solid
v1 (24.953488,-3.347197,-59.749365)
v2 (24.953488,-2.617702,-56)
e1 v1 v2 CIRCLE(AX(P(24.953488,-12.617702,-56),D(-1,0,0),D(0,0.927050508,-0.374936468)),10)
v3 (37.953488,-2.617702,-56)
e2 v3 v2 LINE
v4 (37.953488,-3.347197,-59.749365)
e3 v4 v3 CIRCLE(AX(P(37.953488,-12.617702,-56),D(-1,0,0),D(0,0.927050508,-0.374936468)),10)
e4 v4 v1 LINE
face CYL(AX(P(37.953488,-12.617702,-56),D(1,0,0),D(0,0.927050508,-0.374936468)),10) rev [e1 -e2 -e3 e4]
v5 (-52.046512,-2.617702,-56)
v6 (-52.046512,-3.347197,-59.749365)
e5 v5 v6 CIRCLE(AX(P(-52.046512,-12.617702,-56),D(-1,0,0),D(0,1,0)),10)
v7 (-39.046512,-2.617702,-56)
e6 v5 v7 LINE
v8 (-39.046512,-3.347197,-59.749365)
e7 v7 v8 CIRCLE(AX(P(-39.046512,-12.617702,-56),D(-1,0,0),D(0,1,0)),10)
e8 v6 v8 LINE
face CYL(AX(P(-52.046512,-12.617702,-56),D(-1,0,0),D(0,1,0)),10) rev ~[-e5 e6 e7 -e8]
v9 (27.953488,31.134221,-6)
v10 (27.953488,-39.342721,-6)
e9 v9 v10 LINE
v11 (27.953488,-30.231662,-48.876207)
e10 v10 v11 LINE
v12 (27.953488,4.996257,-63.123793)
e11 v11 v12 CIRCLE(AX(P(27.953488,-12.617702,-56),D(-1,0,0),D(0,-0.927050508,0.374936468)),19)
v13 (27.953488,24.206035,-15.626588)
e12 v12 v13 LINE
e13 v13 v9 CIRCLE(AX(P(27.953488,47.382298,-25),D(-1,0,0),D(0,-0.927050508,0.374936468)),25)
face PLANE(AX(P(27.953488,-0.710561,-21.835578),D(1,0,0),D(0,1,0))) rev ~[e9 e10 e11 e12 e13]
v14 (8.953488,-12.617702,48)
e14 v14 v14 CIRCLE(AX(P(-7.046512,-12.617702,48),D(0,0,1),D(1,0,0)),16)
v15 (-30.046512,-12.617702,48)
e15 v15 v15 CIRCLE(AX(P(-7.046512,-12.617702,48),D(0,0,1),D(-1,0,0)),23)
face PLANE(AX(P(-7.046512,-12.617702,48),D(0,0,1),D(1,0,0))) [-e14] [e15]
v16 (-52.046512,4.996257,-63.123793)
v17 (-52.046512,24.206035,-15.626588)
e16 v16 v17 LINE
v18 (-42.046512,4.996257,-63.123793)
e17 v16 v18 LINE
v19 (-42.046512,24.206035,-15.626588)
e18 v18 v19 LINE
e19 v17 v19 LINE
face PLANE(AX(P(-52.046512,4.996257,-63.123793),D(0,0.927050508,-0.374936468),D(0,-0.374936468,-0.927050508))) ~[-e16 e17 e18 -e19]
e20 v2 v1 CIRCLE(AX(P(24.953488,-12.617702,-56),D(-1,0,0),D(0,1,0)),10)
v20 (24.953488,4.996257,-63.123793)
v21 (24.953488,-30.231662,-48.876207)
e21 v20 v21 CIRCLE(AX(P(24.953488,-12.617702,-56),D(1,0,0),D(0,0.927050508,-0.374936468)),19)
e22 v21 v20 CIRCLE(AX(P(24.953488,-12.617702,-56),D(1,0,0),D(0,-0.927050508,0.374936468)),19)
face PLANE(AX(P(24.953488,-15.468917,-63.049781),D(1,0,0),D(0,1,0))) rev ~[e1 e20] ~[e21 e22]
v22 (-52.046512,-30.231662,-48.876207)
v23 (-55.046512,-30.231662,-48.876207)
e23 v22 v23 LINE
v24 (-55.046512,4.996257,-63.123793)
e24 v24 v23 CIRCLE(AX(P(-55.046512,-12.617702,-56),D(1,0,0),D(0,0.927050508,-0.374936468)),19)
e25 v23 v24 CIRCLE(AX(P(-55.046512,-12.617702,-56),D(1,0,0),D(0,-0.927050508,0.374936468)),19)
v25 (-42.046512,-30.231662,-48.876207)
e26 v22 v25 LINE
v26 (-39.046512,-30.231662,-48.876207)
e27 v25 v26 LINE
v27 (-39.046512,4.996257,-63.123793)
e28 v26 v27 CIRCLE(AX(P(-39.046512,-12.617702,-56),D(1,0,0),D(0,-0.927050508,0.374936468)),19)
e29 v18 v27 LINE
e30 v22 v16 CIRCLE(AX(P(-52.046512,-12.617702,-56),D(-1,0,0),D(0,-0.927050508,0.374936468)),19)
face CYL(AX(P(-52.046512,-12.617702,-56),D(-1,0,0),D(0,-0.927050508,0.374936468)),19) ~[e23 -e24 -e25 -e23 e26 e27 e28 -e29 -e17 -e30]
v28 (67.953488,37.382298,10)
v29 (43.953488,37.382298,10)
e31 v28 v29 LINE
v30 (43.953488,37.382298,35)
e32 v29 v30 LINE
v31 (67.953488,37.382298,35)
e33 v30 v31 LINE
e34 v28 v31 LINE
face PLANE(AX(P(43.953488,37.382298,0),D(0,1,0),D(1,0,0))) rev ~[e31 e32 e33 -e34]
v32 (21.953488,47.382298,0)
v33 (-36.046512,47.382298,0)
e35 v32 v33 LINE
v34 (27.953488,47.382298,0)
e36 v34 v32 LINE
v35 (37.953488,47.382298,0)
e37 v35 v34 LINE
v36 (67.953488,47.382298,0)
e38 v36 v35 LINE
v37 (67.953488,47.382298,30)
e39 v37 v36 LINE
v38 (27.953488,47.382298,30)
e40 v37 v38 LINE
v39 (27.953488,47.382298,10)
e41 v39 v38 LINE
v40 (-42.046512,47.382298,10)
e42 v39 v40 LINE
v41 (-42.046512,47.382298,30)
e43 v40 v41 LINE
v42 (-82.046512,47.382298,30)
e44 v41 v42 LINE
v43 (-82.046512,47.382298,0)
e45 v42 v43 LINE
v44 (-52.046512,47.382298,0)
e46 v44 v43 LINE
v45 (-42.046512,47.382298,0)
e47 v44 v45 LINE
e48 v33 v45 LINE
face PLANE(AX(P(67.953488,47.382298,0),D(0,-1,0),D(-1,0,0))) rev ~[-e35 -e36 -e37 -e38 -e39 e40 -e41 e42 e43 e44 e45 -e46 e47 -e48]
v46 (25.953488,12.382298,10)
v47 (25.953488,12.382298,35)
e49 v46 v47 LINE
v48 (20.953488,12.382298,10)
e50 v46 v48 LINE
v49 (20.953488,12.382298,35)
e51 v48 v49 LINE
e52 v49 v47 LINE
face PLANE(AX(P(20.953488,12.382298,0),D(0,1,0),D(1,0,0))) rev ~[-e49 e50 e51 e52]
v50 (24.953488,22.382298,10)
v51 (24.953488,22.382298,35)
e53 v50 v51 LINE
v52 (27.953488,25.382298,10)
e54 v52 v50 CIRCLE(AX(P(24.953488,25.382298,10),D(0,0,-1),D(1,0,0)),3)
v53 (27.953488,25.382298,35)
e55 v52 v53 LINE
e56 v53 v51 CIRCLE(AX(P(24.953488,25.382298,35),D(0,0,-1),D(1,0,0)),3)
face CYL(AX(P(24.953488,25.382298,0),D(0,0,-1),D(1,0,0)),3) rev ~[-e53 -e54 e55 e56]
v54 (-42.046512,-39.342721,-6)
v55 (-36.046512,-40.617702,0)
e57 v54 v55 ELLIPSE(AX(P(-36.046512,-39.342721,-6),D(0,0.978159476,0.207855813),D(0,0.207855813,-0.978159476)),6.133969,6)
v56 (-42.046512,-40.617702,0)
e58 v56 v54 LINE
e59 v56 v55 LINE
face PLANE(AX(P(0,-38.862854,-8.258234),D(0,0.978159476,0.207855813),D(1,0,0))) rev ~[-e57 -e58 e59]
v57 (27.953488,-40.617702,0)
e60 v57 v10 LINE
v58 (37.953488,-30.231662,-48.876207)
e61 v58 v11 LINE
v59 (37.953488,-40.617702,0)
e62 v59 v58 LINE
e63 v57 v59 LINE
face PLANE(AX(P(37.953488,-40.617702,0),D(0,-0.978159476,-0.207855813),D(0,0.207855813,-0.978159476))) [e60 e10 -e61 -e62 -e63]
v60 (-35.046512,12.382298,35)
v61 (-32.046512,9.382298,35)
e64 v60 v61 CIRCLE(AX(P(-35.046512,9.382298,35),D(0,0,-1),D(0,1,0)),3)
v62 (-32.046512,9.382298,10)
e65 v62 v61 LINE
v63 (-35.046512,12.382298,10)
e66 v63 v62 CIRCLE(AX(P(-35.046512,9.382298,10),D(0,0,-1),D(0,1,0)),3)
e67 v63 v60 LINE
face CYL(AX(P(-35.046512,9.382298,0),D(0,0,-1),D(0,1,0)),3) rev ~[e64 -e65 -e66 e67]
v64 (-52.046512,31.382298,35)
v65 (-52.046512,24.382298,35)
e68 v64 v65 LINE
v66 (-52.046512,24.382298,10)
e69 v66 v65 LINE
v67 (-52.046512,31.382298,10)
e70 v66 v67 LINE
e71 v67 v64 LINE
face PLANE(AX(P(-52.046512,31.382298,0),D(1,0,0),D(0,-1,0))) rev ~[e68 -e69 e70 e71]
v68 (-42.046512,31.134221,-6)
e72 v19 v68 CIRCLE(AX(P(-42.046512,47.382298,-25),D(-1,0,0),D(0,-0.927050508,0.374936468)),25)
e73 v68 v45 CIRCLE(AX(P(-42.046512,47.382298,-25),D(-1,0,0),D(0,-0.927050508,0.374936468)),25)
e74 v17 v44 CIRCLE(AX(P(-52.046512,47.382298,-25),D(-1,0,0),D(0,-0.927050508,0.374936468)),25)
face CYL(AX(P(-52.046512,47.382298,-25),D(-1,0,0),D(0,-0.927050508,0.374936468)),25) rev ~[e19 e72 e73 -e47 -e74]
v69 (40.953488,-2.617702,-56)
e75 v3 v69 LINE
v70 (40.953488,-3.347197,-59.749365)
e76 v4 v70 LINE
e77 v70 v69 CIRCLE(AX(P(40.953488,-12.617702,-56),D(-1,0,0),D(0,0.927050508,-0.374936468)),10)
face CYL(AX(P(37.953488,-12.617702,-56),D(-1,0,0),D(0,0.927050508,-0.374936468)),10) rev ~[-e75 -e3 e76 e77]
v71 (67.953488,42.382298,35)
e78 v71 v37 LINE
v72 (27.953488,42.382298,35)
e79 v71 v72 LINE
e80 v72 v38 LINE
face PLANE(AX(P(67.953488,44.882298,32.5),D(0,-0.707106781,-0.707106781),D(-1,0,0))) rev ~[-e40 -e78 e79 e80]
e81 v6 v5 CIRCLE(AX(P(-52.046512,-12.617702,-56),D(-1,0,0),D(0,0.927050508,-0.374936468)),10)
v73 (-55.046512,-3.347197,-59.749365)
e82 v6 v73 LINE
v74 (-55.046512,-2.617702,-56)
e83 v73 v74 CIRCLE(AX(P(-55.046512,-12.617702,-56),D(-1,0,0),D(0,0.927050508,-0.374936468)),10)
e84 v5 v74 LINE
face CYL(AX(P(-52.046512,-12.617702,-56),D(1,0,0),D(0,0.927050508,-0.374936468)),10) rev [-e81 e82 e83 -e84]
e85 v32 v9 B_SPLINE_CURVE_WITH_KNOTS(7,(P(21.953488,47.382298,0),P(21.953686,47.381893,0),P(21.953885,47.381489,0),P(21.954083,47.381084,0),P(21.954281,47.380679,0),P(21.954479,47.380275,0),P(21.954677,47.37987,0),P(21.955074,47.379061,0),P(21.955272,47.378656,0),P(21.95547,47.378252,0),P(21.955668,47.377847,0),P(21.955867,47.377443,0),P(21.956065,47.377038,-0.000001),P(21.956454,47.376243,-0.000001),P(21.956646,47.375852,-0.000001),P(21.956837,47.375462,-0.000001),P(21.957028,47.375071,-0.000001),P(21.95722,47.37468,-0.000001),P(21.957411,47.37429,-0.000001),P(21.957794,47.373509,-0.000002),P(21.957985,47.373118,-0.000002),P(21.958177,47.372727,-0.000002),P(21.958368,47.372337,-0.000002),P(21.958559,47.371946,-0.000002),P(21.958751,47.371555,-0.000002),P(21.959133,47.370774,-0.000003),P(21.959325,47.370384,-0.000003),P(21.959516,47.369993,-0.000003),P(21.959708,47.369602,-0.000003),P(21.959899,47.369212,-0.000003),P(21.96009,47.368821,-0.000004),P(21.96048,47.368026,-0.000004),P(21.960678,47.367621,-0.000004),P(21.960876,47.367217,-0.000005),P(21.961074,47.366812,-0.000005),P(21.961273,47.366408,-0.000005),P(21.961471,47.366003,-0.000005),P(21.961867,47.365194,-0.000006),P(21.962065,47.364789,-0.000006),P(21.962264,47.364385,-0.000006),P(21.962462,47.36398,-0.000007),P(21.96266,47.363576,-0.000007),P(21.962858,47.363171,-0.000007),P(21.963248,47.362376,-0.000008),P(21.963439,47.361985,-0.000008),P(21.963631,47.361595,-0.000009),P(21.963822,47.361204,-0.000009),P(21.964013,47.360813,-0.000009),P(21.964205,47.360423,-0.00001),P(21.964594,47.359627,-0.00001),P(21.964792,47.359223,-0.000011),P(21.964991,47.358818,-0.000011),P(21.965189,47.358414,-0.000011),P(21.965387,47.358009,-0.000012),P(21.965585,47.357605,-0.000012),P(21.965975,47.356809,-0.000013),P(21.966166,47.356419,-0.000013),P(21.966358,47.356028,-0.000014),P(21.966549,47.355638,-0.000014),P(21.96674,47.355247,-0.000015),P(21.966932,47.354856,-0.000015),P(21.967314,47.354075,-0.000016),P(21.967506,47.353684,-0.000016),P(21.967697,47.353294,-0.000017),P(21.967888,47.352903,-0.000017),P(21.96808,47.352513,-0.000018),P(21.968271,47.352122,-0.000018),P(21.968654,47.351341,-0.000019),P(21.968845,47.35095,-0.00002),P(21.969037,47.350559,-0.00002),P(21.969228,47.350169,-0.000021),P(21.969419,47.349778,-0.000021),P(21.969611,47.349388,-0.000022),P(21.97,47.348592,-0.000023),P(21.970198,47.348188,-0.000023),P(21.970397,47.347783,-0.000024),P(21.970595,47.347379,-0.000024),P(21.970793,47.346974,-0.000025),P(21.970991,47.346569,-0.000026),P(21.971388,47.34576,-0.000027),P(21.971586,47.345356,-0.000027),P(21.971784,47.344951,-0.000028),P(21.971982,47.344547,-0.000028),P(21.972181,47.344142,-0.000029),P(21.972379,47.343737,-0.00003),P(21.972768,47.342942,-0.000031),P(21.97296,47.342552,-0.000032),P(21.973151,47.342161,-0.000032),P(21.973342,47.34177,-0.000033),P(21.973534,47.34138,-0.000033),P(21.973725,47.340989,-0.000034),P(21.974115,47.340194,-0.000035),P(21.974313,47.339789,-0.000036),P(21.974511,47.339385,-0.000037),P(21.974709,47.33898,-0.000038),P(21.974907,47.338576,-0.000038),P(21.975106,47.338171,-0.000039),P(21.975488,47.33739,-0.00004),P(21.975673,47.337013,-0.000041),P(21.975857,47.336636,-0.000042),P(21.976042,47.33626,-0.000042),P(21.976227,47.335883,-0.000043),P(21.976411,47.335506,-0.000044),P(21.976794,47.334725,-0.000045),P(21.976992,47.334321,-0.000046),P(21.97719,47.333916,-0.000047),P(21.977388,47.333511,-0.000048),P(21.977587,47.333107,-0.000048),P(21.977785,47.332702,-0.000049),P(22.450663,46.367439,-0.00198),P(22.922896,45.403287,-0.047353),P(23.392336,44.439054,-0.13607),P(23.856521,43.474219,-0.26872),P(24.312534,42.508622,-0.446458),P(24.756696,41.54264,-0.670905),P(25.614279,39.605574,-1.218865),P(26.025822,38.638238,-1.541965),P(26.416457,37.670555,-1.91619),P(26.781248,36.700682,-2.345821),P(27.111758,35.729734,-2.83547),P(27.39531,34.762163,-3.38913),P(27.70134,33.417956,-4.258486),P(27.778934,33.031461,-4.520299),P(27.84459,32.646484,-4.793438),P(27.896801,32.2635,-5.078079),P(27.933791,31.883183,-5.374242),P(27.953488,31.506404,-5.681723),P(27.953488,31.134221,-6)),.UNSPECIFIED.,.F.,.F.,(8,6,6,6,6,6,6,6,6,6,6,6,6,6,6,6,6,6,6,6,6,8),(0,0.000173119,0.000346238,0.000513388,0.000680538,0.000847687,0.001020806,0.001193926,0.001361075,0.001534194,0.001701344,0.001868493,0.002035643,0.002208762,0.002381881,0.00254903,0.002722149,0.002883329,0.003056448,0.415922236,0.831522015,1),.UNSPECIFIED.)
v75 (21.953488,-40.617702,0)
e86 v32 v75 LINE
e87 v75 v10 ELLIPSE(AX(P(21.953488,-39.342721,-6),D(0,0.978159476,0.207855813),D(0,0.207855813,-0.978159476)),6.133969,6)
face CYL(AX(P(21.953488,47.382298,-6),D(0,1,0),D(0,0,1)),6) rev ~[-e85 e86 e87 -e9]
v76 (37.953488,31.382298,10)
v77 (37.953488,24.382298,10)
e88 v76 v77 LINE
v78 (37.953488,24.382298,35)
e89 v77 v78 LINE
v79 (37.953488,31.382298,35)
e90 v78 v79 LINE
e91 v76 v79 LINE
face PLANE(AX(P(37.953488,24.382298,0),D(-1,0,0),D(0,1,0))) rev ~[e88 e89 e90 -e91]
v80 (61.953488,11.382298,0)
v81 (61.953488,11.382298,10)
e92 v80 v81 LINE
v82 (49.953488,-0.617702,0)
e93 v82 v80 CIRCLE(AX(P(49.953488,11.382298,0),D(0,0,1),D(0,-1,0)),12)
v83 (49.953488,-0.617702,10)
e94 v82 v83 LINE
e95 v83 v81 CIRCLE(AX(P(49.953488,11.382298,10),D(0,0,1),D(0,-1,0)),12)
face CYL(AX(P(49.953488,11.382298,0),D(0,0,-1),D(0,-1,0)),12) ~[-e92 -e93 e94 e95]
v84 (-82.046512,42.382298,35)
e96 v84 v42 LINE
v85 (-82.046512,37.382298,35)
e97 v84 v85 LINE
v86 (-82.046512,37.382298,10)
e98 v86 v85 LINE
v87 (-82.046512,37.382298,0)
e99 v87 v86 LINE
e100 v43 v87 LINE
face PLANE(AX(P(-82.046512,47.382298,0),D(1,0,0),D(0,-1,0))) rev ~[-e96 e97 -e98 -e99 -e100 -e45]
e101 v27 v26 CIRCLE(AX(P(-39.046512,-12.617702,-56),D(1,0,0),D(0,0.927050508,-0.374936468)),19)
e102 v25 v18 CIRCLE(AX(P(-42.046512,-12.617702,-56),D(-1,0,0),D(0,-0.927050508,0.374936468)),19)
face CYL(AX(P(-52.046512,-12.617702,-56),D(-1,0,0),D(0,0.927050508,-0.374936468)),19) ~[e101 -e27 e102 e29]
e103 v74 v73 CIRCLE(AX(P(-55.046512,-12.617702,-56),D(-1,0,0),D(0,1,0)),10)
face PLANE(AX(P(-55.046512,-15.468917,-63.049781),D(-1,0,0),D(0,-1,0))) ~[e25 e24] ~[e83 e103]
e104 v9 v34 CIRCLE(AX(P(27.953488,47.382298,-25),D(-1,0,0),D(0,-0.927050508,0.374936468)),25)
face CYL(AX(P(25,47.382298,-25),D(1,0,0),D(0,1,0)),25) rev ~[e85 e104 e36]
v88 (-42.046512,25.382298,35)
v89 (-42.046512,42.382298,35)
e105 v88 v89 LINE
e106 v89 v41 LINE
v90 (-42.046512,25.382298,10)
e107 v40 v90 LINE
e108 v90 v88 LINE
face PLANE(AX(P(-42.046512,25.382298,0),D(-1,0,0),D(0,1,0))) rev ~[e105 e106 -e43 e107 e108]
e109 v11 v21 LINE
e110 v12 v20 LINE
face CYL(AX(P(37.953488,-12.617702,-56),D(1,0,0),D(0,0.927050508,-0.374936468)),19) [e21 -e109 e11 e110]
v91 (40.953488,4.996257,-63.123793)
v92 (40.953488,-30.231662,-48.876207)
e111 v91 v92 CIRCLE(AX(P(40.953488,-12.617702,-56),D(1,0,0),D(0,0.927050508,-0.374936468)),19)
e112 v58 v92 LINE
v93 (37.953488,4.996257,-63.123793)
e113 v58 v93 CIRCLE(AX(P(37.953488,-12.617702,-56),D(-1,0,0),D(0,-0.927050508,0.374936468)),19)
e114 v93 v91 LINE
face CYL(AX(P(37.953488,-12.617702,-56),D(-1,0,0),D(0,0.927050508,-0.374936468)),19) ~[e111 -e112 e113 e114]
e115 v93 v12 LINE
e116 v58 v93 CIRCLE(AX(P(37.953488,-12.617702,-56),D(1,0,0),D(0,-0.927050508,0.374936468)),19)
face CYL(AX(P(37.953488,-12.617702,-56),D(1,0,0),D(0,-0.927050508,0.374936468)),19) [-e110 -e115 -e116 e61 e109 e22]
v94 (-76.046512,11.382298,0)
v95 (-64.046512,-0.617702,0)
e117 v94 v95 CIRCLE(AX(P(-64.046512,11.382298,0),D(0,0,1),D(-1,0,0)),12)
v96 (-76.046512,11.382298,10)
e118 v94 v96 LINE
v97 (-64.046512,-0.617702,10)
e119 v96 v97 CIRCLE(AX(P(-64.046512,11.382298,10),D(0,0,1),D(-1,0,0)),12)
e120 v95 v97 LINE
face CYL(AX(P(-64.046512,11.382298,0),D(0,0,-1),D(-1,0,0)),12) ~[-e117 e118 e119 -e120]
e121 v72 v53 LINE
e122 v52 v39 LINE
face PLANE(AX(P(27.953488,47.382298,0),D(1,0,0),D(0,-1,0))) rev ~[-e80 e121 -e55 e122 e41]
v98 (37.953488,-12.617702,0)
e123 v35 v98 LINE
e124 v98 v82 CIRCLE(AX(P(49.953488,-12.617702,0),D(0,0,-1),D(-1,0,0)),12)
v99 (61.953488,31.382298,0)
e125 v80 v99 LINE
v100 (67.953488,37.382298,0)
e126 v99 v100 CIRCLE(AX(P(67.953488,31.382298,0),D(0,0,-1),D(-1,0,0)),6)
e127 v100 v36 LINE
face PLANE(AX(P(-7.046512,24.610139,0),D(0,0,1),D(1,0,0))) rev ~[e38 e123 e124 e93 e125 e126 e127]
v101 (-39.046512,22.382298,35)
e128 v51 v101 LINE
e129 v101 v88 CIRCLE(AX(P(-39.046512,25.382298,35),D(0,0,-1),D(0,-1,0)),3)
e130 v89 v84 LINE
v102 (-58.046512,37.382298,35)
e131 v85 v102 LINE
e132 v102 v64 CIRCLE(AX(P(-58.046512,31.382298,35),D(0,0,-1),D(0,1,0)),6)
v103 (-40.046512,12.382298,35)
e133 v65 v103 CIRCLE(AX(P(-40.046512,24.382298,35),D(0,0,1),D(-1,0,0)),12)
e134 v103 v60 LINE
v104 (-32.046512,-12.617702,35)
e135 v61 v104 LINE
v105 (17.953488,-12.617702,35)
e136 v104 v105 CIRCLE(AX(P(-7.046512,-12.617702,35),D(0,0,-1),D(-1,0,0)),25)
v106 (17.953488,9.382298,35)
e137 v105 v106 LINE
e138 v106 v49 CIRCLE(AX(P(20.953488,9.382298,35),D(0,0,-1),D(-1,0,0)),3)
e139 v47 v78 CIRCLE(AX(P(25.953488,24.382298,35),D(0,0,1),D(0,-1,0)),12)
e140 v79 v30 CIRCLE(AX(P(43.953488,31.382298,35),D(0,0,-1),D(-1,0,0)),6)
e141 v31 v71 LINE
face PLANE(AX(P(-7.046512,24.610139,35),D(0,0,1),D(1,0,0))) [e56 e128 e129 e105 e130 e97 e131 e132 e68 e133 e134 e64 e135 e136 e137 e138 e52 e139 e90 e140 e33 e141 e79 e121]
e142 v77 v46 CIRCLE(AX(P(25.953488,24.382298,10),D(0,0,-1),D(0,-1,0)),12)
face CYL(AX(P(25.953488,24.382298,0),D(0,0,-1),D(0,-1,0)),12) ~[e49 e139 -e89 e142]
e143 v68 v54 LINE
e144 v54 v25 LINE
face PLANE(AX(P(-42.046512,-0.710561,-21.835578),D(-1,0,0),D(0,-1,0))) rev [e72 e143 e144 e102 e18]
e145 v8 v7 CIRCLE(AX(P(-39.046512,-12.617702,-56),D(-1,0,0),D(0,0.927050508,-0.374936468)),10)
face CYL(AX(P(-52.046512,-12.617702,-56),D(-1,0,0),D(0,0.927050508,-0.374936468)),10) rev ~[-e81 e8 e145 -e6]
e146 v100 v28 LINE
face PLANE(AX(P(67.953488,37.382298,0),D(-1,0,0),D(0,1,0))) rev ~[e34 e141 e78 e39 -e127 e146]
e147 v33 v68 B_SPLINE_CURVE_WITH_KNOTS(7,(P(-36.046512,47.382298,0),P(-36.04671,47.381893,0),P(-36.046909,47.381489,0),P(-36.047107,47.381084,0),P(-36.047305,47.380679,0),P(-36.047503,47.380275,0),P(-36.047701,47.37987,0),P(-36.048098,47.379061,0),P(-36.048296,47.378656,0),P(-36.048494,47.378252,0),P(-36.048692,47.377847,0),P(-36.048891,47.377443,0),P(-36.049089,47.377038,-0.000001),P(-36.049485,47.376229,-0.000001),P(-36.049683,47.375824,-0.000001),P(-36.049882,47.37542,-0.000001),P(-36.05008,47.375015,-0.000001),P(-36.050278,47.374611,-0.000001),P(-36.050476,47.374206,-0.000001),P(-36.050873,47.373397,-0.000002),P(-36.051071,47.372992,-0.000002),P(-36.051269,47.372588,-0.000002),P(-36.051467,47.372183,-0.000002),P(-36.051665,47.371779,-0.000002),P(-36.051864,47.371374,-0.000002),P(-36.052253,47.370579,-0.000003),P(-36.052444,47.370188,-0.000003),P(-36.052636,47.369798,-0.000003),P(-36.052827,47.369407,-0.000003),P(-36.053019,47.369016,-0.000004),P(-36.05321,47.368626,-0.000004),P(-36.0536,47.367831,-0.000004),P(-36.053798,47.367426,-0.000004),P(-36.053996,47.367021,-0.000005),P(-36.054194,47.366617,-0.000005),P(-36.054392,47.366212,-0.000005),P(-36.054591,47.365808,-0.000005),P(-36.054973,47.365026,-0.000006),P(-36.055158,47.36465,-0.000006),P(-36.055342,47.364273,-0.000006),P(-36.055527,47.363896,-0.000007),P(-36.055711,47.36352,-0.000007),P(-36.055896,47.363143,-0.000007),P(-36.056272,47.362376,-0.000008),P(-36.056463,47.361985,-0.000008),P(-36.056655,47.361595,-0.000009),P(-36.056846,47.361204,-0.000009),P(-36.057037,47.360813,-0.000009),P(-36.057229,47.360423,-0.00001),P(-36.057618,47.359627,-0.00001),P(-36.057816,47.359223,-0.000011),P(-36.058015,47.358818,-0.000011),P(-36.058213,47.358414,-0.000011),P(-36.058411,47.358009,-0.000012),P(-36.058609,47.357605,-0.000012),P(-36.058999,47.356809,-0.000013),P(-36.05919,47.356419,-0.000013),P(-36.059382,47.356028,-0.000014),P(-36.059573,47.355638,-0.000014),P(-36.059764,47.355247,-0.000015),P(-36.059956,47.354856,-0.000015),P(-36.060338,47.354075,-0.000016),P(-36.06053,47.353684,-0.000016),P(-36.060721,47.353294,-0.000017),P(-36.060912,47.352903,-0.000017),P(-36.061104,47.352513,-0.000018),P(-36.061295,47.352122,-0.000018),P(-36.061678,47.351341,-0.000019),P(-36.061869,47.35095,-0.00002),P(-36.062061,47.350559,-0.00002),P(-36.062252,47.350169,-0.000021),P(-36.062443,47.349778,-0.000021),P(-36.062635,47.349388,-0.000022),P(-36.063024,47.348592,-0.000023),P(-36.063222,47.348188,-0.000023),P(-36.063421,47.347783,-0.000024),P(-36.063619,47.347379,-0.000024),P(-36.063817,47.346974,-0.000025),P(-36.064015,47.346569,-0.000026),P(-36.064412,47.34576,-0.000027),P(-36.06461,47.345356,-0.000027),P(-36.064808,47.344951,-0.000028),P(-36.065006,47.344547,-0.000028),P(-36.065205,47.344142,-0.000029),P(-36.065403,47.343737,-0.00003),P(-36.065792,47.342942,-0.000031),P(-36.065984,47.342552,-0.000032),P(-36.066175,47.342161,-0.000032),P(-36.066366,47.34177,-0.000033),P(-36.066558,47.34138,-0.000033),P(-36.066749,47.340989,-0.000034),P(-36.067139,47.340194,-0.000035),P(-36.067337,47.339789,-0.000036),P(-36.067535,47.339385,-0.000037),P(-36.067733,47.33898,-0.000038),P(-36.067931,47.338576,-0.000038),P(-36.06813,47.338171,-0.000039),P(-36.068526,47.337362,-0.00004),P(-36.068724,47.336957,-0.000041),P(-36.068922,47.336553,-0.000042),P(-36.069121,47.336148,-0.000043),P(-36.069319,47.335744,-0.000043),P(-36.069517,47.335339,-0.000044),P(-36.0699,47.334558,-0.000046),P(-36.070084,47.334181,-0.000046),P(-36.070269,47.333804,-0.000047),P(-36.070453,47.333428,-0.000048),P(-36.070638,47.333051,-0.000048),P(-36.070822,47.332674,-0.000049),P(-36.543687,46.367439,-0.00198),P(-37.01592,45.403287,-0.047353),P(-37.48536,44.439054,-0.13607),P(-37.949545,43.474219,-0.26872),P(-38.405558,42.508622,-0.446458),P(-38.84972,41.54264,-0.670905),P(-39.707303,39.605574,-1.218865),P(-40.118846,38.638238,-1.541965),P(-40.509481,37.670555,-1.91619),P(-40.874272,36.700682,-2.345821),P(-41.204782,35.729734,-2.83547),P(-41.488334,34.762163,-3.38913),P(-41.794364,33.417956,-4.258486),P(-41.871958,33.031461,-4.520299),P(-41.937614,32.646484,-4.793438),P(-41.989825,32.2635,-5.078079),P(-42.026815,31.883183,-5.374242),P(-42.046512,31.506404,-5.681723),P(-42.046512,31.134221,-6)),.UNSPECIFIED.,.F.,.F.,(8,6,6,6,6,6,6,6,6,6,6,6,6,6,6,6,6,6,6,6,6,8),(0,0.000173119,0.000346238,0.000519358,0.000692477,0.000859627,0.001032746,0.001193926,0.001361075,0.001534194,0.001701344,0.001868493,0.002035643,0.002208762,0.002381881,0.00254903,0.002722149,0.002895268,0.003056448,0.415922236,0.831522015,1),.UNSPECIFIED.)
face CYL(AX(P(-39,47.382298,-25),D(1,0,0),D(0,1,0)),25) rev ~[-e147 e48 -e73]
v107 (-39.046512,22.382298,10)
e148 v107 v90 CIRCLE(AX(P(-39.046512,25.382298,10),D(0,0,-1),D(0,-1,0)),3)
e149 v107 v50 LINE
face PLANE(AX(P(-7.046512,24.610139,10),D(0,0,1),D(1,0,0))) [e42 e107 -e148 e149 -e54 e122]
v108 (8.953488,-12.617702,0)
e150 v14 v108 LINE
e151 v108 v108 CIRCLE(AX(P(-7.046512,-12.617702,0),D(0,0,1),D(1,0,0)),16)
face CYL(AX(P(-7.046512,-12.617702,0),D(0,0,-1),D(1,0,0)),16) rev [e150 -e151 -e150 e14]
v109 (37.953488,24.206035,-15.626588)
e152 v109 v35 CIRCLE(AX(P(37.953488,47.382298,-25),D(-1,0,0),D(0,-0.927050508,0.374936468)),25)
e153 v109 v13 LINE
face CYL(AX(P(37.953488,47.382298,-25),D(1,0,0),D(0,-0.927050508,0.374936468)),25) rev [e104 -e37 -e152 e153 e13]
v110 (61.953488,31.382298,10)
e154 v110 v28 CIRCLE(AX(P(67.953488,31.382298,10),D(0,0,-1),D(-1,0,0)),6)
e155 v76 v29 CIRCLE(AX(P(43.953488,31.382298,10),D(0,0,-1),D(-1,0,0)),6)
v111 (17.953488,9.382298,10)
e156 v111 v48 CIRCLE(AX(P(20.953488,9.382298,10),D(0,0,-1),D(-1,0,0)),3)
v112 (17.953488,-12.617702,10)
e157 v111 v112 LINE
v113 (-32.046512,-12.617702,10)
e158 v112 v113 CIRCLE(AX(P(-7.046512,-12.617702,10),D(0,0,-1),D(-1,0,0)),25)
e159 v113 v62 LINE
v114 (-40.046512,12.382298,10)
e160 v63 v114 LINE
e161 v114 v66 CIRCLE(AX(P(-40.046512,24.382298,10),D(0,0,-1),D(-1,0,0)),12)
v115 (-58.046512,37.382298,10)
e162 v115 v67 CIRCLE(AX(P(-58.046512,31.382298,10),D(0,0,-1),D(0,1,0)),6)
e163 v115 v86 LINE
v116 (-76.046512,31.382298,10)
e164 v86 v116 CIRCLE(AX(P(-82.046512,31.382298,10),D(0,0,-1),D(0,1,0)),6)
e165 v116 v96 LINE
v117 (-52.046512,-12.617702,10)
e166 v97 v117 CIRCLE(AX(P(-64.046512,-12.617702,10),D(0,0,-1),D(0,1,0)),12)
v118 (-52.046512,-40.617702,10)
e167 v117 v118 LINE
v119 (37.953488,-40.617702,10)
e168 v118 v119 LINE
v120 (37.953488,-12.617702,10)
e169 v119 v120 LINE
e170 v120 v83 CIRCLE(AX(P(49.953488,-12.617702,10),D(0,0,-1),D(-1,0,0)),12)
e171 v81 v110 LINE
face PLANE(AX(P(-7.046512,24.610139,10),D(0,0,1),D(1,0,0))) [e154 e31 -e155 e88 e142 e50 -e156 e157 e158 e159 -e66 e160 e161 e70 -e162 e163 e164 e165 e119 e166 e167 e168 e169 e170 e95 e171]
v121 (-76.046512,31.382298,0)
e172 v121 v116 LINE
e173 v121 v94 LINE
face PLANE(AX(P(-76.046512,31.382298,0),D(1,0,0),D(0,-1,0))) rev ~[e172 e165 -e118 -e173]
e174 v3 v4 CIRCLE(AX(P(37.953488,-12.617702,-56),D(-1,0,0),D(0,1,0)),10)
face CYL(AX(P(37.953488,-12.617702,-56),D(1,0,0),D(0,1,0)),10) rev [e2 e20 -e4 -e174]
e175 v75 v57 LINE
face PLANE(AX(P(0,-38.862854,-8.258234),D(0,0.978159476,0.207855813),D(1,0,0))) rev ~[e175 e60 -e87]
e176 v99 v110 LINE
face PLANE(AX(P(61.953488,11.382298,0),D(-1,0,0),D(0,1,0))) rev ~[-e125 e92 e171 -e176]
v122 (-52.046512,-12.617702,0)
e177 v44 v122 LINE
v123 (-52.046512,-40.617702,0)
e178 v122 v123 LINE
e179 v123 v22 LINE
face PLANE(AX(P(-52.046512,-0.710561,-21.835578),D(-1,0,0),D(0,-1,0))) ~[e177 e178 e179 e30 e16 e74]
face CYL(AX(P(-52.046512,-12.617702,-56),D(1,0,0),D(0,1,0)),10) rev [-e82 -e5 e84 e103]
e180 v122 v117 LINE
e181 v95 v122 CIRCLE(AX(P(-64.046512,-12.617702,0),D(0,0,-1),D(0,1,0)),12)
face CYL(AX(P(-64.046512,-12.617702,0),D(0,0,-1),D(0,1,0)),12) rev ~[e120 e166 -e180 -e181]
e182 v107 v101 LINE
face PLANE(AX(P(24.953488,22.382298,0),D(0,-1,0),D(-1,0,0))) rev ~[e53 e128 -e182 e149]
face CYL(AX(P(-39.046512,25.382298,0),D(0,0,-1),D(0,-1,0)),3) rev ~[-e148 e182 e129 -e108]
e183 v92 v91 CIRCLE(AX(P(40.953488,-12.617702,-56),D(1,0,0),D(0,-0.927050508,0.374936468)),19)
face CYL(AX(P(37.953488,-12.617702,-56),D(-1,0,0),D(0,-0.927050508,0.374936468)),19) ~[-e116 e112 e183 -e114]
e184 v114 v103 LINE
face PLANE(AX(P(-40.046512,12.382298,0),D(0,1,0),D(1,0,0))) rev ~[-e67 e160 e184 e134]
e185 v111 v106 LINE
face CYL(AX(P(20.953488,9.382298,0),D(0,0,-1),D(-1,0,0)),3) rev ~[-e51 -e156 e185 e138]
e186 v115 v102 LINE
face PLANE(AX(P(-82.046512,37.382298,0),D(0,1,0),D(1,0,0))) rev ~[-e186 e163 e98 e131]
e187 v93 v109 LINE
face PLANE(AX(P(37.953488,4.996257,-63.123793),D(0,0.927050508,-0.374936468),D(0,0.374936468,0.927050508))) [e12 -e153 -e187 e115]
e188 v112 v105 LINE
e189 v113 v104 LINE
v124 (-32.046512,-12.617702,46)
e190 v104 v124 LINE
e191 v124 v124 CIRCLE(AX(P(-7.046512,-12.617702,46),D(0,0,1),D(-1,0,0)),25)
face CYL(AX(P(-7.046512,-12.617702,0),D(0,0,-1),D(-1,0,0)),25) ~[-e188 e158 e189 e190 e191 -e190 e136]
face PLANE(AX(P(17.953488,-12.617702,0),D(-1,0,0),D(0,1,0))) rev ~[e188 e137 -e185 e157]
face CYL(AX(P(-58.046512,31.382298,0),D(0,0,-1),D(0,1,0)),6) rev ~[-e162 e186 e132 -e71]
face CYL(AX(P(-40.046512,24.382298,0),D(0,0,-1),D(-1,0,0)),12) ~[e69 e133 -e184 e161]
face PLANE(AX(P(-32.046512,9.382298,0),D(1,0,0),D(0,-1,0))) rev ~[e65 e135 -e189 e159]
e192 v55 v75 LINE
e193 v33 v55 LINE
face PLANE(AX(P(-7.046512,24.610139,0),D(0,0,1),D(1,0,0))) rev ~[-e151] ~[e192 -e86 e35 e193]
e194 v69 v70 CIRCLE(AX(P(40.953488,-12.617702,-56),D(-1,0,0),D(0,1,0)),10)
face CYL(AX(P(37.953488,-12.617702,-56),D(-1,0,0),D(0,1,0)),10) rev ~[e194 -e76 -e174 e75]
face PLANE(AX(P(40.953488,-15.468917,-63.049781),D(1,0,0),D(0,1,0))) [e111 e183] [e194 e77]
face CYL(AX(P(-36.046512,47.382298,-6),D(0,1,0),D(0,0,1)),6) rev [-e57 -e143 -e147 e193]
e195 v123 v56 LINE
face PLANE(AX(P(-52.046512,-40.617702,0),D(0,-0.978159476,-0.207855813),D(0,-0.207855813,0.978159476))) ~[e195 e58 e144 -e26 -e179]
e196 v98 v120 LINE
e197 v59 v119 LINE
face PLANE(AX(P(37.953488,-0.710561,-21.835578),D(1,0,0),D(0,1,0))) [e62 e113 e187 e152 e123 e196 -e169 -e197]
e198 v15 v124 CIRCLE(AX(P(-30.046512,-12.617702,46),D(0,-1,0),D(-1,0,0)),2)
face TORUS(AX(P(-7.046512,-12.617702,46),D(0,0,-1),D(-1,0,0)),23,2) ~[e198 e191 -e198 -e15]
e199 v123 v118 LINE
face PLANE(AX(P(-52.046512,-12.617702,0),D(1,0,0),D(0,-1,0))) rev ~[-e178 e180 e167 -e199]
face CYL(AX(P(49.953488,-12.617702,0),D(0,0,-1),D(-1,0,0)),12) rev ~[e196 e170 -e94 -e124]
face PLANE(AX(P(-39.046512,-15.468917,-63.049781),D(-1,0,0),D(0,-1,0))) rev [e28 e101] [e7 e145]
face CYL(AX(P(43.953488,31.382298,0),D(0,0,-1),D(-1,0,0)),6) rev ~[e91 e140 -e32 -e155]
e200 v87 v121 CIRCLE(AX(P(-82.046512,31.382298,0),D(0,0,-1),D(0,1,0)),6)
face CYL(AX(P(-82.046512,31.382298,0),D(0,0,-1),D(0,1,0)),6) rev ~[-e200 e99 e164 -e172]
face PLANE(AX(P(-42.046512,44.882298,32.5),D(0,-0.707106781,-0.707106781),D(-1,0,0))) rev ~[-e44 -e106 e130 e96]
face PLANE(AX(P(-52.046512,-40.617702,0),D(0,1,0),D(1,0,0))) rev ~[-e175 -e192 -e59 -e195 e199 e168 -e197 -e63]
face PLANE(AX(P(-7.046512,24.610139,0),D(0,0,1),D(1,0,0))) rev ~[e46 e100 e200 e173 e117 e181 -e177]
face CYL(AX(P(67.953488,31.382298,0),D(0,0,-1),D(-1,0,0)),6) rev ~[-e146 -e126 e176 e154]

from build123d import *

# Parameters (mm, degrees)
F0_R          = 16
F1_DEPTH      = 10
F2_DEPTH      = 35
F3_DEPTH      = 48
F5_DEPTH      = 10
F6_DEPTH      = 3
F6_DEPTH_BACK = 13
F7_T4_DEPTH   = 103
F7_S5_R       = 25
F7_T6_DEPTH   = 53
F7_T11_DEPTH  = 103
F7_S12_R      = 25
F7_T13_DEPTH  = 53
F13_R         = 2
F14_SIZE      = 5


# Not quite as in the source:
# - a fillet or chamfer that OpenCascade refuses, or shapes differently, is made with other operations: its cross-section is extruded or revolved along the edge and cut away or added
# - a feature of the source that left no trace in its solid (it failed there, or was rolled back) is left out
# - a pattern or mirror of a feature is missing from the dataset's text; its kind, count and spacing are read off the source's solid


with BuildPart() as f1:
    # F0 (on Top) → F1 (new body)
    with BuildSketch(Plane.XY):
        with BuildLine():
            Line((-42.0465118704, 47.3822976644), (-82.0465118704, 47.3822976644))
            Line((-82.0465118704, 47.3822976644), (-82.0465118704, 37.3822976644))
            Line((-82.0465118704, 37.3822976644), (-58.0465118704, 37.3822976644))
            ThreePointArc((-58.0465118704, 37.3822976644), (-53.8038711833, 35.6249383515), (-52.0465118704, 31.3822976644))
            Line((-52.0465118704, 31.3822976644), (-52.0465118704, 24.3822976644))
            ThreePointArc((-52.0465118704, 24.3822976644), (-48.5317932447, 15.8970162901), (-40.0465118704, 12.3822976644))
            Line((-40.0465118704, 12.3822976644), (-35.0465118704, 12.3822976644))
            ThreePointArc((-35.0465118704, 12.3822976644), (-32.9251915269, 11.5036180079), (-32.0465118704, 9.3822976644))
            Line((-32.0465118704, 9.3822976644), (-32.0465118704, -12.6177023356))
            ThreePointArc((-32.0465118704, -12.6177023356), (-7.0465118704, 12.3822976644), (17.9534881296, -12.6177023356))
            Line((17.9534881296, -12.6177023356), (17.9534881296, 9.3822976644))
            ThreePointArc((17.9534881296, 9.3822976644), (18.832167786, 11.5036180079), (20.9534881296, 12.3822976644))
            Line((20.9534881296, 12.3822976644), (25.9534881296, 12.3822976644))
            ThreePointArc((25.9534881296, 12.3822976644), (34.4387695038, 15.8970162901), (37.9534881296, 24.3822976644))
            Line((37.9534881296, 24.3822976644), (37.9534881296, 31.3822976644))
            ThreePointArc((37.9534881296, 31.3822976644), (39.7108474424, 35.6249383515), (43.9534881296, 37.3822976644))
            Line((43.9534881296, 37.3822976644), (67.9534881296, 37.3822976644))
            Line((67.9534881296, 37.3822976644), (67.9534881296, 47.3822976644))
            Line((67.9534881296, 47.3822976644), (27.9534881296, 47.3822976644))
            Line((27.9534881296, 47.3822976644), (27.9534881296, 25.3822976644))
            ThreePointArc((27.9534881296, 25.3822976644), (27.0748084731, 23.2609773208), (24.9534881296, 22.3822976644))
            Line((24.9534881296, 22.3822976644), (-39.0465118704, 22.3822976644))
            ThreePointArc((-39.0465118704, 22.3822976644), (-41.167832214, 23.2609773208), (-42.0465118704, 25.3822976644))
            Line((-42.0465118704, 25.3822976644), (-42.0465118704, 47.3822976644))
        make_face()
        with BuildLine():
            Line((27.9534881296, 47.3822976644), (-42.0465118704, 47.3822976644))
            Line((-42.0465118704, 47.3822976644), (-42.0465118704, 25.3822976644))
            ThreePointArc((-42.0465118704, 25.3822976644), (-41.167832214, 23.2609773208), (-39.0465118704, 22.3822976644))
            Line((-39.0465118704, 22.3822976644), (24.9534881296, 22.3822976644))
            ThreePointArc((24.9534881296, 22.3822976644), (27.0748084731, 23.2609773208), (27.9534881296, 25.3822976644))
            Line((27.9534881296, 25.3822976644), (27.9534881296, 47.3822976644))
        make_face()
        with BuildLine():
            Line((-58.0465118704, 37.3822976644), (-82.0465118704, 37.3822976644))
            ThreePointArc((-82.0465118704, 37.3822976644), (-77.8038711833, 35.6249383515), (-76.0465118704, 31.3822976644))
            Line((-76.0465118704, 31.3822976644), (-76.0465118704, 11.3822976644))
            ThreePointArc((-76.0465118704, 11.3822976644), (-72.5317932447, 2.8970162901), (-64.0465118704, -0.6177023356))
            ThreePointArc((-64.0465118704, -0.6177023356), (-55.5612304962, -4.1324209614), (-52.0465118704, -12.6177023356))
            Line((-52.0465118704, -12.6177023356), (-52.0465118704, -40.6177023356))
            Line((-52.0465118704, -40.6177023356), (37.9534881296, -40.6177023356))
            Line((37.9534881296, -40.6177023356), (37.9534881296, -12.6177023356))
            ThreePointArc((37.9534881296, -12.6177023356), (41.4682067553, -4.1324209614), (49.9534881296, -0.6177023356))
            ThreePointArc((49.9534881296, -0.6177023356), (58.4387695038, 2.8970162901), (61.9534881296, 11.3822976644))
            Line((61.9534881296, 11.3822976644), (61.9534881296, 31.3822976644))
            ThreePointArc((61.9534881296, 31.3822976644), (63.7108474424, 35.6249383515), (67.9534881296, 37.3822976644))
            Line((67.9534881296, 37.3822976644), (43.9534881296, 37.3822976644))
            ThreePointArc((43.9534881296, 37.3822976644), (39.7108474424, 35.6249383515), (37.9534881296, 31.3822976644))
            Line((37.9534881296, 31.3822976644), (37.9534881296, 24.3822976644))
            ThreePointArc((37.9534881296, 24.3822976644), (34.4387695038, 15.8970162901), (25.9534881296, 12.3822976644))
            Line((25.9534881296, 12.3822976644), (20.9534881296, 12.3822976644))
            ThreePointArc((20.9534881296, 12.3822976644), (18.832167786, 11.5036180079), (17.9534881296, 9.3822976644))
            Line((17.9534881296, 9.3822976644), (17.9534881296, -12.6177023356))
            ThreePointArc((17.9534881296, -12.6177023356), (-7.0465118704, -37.6177023356), (-32.0465118704, -12.6177023356))
            Line((-32.0465118704, -12.6177023356), (-32.0465118704, 9.3822976644))
            ThreePointArc((-32.0465118704, 9.3822976644), (-32.9251915269, 11.5036180079), (-35.0465118704, 12.3822976644))
            Line((-35.0465118704, 12.3822976644), (-40.0465118704, 12.3822976644))
            ThreePointArc((-40.0465118704, 12.3822976644), (-48.5317932447, 15.8970162901), (-52.0465118704, 24.3822976644))
            Line((-52.0465118704, 24.3822976644), (-52.0465118704, 31.3822976644))
            ThreePointArc((-52.0465118704, 31.3822976644), (-53.8038711833, 35.6249383515), (-58.0465118704, 37.3822976644))
        make_face()
        with BuildLine():
            ThreePointArc((17.9534881296, -12.6177023356), (-7.0465118704, 12.3822976644), (-32.0465118704, -12.6177023356))
            ThreePointArc((-32.0465118704, -12.6177023356), (-7.0465118704, -37.6177023356), (17.9534881296, -12.6177023356))
        make_face()
        with Locations((-7.0465118704, -12.6177023356)):
            Circle(F0_R, mode=Mode.SUBTRACT)
    extrude(amount=F1_DEPTH)

    # F0 (on Top) → F2 (join)
    with BuildSketch(Plane.XY):
        with BuildLine():
            Line((-42.0465118704, 47.3822976644), (-82.0465118704, 47.3822976644))
            Line((-82.0465118704, 47.3822976644), (-82.0465118704, 37.3822976644))
            Line((-82.0465118704, 37.3822976644), (-58.0465118704, 37.3822976644))
            ThreePointArc((-58.0465118704, 37.3822976644), (-53.8038711833, 35.6249383515), (-52.0465118704, 31.3822976644))
            Line((-52.0465118704, 31.3822976644), (-52.0465118704, 24.3822976644))
            ThreePointArc((-52.0465118704, 24.3822976644), (-48.5317932447, 15.8970162901), (-40.0465118704, 12.3822976644))
            Line((-40.0465118704, 12.3822976644), (-35.0465118704, 12.3822976644))
            ThreePointArc((-35.0465118704, 12.3822976644), (-32.9251915269, 11.5036180079), (-32.0465118704, 9.3822976644))
            Line((-32.0465118704, 9.3822976644), (-32.0465118704, -12.6177023356))
            ThreePointArc((-32.0465118704, -12.6177023356), (-7.0465118704, 12.3822976644), (17.9534881296, -12.6177023356))
            Line((17.9534881296, -12.6177023356), (17.9534881296, 9.3822976644))
            ThreePointArc((17.9534881296, 9.3822976644), (18.832167786, 11.5036180079), (20.9534881296, 12.3822976644))
            Line((20.9534881296, 12.3822976644), (25.9534881296, 12.3822976644))
            ThreePointArc((25.9534881296, 12.3822976644), (34.4387695038, 15.8970162901), (37.9534881296, 24.3822976644))
            Line((37.9534881296, 24.3822976644), (37.9534881296, 31.3822976644))
            ThreePointArc((37.9534881296, 31.3822976644), (39.7108474424, 35.6249383515), (43.9534881296, 37.3822976644))
            Line((43.9534881296, 37.3822976644), (67.9534881296, 37.3822976644))
            Line((67.9534881296, 37.3822976644), (67.9534881296, 47.3822976644))
            Line((67.9534881296, 47.3822976644), (27.9534881296, 47.3822976644))
            Line((27.9534881296, 47.3822976644), (27.9534881296, 25.3822976644))
            ThreePointArc((27.9534881296, 25.3822976644), (27.0748084731, 23.2609773208), (24.9534881296, 22.3822976644))
            Line((24.9534881296, 22.3822976644), (-39.0465118704, 22.3822976644))
            ThreePointArc((-39.0465118704, 22.3822976644), (-41.167832214, 23.2609773208), (-42.0465118704, 25.3822976644))
            Line((-42.0465118704, 25.3822976644), (-42.0465118704, 47.3822976644))
        make_face()
        with BuildLine():
            ThreePointArc((17.9534881296, -12.6177023356), (-7.0465118704, 12.3822976644), (-32.0465118704, -12.6177023356))
            ThreePointArc((-32.0465118704, -12.6177023356), (-7.0465118704, -37.6177023356), (17.9534881296, -12.6177023356))
        make_face()
        with Locations((-7.0465118704, -12.6177023356)):
            Circle(F0_R, mode=Mode.SUBTRACT)
    extrude(amount=F2_DEPTH)

    # F0 (on Top) → F3 (join)
    with BuildSketch(Plane.XY):
        with BuildLine():
            ThreePointArc((17.9534881296, -12.6177023356), (-7.0465118704, 12.3822976644), (-32.0465118704, -12.6177023356))
            ThreePointArc((-32.0465118704, -12.6177023356), (-7.0465118704, -37.6177023356), (17.9534881296, -12.6177023356))
        make_face()
        with Locations((-7.0465118704, -12.6177023356)):
            Circle(F0_R, mode=Mode.SUBTRACT)
    extrude(amount=F3_DEPTH)

    # F4 (on face) → F5 (join)
    with BuildSketch(Plane.YZ.offset(37.9534881296)):
        with BuildLine():
            Line((-40.6177023356, 0), (-30.2316619949, -48.8762071112))
            ThreePointArc((-30.2316619949, -48.8762071112), (-8.9890134213, -37.3497287751), (6.3822976644, -56))
            ThreePointArc((6.3822976644, -56), (6.0325688893, -59.6286889144), (4.9962573236, -63.1237928888))
            Line((4.9962573236, -63.1237928888), (24.2060349548, -15.6265883042))
            ThreePointArc((24.2060349548, -15.6265883042), (33.4061625118, -4.2715739575), (47.3822976644, 0))
            Line((47.3822976644, 0), (36.7724023624, 0))
            Line((36.7724023624, 0), (-12.6177023356, 0))
            Line((-12.6177023356, 0), (-40.6177023356, 0))
        make_face()
    f5 = extrude(amount=-F5_DEPTH)

    # F5_copies: F5 across plane
    add(f5.mirror(Plane(origin=(-7.046512, 0, 0), x_dir=(0, 0, -1), z_dir=(-1, 0, 0))))

    # F4 (on face) → F6 (join, two sides)
    with BuildSketch(Plane.YZ.offset(37.9534881296)) as f6_sk:
        with BuildLine():
            ThreePointArc((-3.3471972518, -59.7493646783), (-16.367067014, -65.2705050838), (-21.8882074194, -52.2506353217))
            Line((-21.8882074194, -52.2506353217), (-30.2316619949, -48.8762071112))
            ThreePointArc((-30.2316619949, -48.8762071112), (-19.7414952245, -73.6139596592), (4.9962573236, -63.1237928888))
            Line((4.9962573236, -63.1237928888), (-3.3471972518, -59.7493646783))
        make_face()
        with BuildLine():
            ThreePointArc((-21.8882074194, -52.2506353217), (-10.7078660649, -46.1840677764), (-2.6177023356, -56))
            ThreePointArc((-2.6177023356, -56), (-2.801770112, -57.9098362707), (-3.3471972518, -59.7493646783))
            Line((-3.3471972518, -59.7493646783), (4.9962573236, -63.1237928888))
            ThreePointArc((4.9962573236, -63.1237928888), (6.0325688893, -59.6286889144), (6.3822976644, -56))
            ThreePointArc((6.3822976644, -56), (-8.9890134213, -37.3497287751), (-30.2316619949, -48.8762071112))
            Line((-30.2316619949, -48.8762071112), (-21.8882074194, -52.2506353217))
        make_face()
    f6 = extrude(amount=F6_DEPTH) + extrude(f6_sk.sketch, amount=-F6_DEPTH_BACK)

    # F6_copies: F6 across plane
    add(f6.mirror(Plane(origin=(-7.046512, 0, 0), x_dir=(0, 0, -1), z_dir=(-1, 0, 0))))

    # F7: fillet of radius 6 on 2 edges, made by hand


with BuildPart() as f7_tool2:
    # F7_s3 → F7_t4 (new body)
    with BuildSketch(Plane.XZ.offset(-47.3822976644)):
        with BuildLine():
            ThreePointArc((21.9534881296, 0), (26.1961288167, -1.7573593129), (27.9534881296, -6))
            Line((27.9534881296, -6), (27.9534881296, 0))
            Line((27.9534881296, 0), (21.9534881296, 0))
        make_face()
    extrude(amount=F7_T4_DEPTH)

    # F7_s5 → F7_t6 (cut, symmetric)
    with BuildSketch(Plane.YZ.offset(25)):
        with Locations((47.3822976644, -25)):
            Circle(F7_S5_R)
    extrude(amount=F7_T6_DEPTH, both=True, mode=Mode.SUBTRACT)

    split(bisect_by=Plane(origin=(0, -38.8628535351, -8.2582341886), x_dir=(1, 0, 0), z_dir=(0, 0.9781594762, 0.2078558133)), keep=Keep.TOP)


with BuildPart() as f1_1:
    add(f1.part)

    # F7_t1: union F7_tool2
    add(f7_tool2.part)


with BuildPart() as f7_tool9:
    # F7_s10 → F7_t11 (new body)
    with BuildSketch(Plane.XZ.offset(-47.3822976644)):
        with BuildLine():
            ThreePointArc((-36.0465121296, 0), (-40.2891528167, -1.7573593129), (-42.0465121296, -6))
            Line((-42.0465121296, -6), (-42.0465121296, 0))
            Line((-42.0465121296, 0), (-36.0465121296, 0))
        make_face()
    extrude(amount=F7_T11_DEPTH)

    # F7_s12 → F7_t13 (cut, symmetric)
    with BuildSketch(Plane.YZ.offset(-39)):
        with Locations((47.3822976644, -25)):
            Circle(F7_S12_R)
    extrude(amount=F7_T13_DEPTH, both=True, mode=Mode.SUBTRACT)

    split(bisect_by=Plane(origin=(0, -38.8628535351, -8.2582341886), x_dir=(1, 0, 0), z_dir=(0, 0.9781594762, 0.2078558133)), keep=Keep.TOP)


with BuildPart() as f1_2:
    add(f1_1.part)

    # F7_t8: union F7_tool9
    add(f7_tool9.part)

    # F13
    f13_edges = [f1_2.edges().sort_by_distance(p)[0] for p in [
        (-32.046512, -12.617702, 48),
    ]]
    fillet(f13_edges, radius=F13_R)

    # F14
    f14_edges = [f1_2.edges().sort_by_distance(p)[0] for p in [
        (47.953488, 47.382298, 35),
        (-62.046512, 47.382298, 35),
    ]]
    chamfer(f14_edges, length=F14_SIZE)


solid = f1_2.part
